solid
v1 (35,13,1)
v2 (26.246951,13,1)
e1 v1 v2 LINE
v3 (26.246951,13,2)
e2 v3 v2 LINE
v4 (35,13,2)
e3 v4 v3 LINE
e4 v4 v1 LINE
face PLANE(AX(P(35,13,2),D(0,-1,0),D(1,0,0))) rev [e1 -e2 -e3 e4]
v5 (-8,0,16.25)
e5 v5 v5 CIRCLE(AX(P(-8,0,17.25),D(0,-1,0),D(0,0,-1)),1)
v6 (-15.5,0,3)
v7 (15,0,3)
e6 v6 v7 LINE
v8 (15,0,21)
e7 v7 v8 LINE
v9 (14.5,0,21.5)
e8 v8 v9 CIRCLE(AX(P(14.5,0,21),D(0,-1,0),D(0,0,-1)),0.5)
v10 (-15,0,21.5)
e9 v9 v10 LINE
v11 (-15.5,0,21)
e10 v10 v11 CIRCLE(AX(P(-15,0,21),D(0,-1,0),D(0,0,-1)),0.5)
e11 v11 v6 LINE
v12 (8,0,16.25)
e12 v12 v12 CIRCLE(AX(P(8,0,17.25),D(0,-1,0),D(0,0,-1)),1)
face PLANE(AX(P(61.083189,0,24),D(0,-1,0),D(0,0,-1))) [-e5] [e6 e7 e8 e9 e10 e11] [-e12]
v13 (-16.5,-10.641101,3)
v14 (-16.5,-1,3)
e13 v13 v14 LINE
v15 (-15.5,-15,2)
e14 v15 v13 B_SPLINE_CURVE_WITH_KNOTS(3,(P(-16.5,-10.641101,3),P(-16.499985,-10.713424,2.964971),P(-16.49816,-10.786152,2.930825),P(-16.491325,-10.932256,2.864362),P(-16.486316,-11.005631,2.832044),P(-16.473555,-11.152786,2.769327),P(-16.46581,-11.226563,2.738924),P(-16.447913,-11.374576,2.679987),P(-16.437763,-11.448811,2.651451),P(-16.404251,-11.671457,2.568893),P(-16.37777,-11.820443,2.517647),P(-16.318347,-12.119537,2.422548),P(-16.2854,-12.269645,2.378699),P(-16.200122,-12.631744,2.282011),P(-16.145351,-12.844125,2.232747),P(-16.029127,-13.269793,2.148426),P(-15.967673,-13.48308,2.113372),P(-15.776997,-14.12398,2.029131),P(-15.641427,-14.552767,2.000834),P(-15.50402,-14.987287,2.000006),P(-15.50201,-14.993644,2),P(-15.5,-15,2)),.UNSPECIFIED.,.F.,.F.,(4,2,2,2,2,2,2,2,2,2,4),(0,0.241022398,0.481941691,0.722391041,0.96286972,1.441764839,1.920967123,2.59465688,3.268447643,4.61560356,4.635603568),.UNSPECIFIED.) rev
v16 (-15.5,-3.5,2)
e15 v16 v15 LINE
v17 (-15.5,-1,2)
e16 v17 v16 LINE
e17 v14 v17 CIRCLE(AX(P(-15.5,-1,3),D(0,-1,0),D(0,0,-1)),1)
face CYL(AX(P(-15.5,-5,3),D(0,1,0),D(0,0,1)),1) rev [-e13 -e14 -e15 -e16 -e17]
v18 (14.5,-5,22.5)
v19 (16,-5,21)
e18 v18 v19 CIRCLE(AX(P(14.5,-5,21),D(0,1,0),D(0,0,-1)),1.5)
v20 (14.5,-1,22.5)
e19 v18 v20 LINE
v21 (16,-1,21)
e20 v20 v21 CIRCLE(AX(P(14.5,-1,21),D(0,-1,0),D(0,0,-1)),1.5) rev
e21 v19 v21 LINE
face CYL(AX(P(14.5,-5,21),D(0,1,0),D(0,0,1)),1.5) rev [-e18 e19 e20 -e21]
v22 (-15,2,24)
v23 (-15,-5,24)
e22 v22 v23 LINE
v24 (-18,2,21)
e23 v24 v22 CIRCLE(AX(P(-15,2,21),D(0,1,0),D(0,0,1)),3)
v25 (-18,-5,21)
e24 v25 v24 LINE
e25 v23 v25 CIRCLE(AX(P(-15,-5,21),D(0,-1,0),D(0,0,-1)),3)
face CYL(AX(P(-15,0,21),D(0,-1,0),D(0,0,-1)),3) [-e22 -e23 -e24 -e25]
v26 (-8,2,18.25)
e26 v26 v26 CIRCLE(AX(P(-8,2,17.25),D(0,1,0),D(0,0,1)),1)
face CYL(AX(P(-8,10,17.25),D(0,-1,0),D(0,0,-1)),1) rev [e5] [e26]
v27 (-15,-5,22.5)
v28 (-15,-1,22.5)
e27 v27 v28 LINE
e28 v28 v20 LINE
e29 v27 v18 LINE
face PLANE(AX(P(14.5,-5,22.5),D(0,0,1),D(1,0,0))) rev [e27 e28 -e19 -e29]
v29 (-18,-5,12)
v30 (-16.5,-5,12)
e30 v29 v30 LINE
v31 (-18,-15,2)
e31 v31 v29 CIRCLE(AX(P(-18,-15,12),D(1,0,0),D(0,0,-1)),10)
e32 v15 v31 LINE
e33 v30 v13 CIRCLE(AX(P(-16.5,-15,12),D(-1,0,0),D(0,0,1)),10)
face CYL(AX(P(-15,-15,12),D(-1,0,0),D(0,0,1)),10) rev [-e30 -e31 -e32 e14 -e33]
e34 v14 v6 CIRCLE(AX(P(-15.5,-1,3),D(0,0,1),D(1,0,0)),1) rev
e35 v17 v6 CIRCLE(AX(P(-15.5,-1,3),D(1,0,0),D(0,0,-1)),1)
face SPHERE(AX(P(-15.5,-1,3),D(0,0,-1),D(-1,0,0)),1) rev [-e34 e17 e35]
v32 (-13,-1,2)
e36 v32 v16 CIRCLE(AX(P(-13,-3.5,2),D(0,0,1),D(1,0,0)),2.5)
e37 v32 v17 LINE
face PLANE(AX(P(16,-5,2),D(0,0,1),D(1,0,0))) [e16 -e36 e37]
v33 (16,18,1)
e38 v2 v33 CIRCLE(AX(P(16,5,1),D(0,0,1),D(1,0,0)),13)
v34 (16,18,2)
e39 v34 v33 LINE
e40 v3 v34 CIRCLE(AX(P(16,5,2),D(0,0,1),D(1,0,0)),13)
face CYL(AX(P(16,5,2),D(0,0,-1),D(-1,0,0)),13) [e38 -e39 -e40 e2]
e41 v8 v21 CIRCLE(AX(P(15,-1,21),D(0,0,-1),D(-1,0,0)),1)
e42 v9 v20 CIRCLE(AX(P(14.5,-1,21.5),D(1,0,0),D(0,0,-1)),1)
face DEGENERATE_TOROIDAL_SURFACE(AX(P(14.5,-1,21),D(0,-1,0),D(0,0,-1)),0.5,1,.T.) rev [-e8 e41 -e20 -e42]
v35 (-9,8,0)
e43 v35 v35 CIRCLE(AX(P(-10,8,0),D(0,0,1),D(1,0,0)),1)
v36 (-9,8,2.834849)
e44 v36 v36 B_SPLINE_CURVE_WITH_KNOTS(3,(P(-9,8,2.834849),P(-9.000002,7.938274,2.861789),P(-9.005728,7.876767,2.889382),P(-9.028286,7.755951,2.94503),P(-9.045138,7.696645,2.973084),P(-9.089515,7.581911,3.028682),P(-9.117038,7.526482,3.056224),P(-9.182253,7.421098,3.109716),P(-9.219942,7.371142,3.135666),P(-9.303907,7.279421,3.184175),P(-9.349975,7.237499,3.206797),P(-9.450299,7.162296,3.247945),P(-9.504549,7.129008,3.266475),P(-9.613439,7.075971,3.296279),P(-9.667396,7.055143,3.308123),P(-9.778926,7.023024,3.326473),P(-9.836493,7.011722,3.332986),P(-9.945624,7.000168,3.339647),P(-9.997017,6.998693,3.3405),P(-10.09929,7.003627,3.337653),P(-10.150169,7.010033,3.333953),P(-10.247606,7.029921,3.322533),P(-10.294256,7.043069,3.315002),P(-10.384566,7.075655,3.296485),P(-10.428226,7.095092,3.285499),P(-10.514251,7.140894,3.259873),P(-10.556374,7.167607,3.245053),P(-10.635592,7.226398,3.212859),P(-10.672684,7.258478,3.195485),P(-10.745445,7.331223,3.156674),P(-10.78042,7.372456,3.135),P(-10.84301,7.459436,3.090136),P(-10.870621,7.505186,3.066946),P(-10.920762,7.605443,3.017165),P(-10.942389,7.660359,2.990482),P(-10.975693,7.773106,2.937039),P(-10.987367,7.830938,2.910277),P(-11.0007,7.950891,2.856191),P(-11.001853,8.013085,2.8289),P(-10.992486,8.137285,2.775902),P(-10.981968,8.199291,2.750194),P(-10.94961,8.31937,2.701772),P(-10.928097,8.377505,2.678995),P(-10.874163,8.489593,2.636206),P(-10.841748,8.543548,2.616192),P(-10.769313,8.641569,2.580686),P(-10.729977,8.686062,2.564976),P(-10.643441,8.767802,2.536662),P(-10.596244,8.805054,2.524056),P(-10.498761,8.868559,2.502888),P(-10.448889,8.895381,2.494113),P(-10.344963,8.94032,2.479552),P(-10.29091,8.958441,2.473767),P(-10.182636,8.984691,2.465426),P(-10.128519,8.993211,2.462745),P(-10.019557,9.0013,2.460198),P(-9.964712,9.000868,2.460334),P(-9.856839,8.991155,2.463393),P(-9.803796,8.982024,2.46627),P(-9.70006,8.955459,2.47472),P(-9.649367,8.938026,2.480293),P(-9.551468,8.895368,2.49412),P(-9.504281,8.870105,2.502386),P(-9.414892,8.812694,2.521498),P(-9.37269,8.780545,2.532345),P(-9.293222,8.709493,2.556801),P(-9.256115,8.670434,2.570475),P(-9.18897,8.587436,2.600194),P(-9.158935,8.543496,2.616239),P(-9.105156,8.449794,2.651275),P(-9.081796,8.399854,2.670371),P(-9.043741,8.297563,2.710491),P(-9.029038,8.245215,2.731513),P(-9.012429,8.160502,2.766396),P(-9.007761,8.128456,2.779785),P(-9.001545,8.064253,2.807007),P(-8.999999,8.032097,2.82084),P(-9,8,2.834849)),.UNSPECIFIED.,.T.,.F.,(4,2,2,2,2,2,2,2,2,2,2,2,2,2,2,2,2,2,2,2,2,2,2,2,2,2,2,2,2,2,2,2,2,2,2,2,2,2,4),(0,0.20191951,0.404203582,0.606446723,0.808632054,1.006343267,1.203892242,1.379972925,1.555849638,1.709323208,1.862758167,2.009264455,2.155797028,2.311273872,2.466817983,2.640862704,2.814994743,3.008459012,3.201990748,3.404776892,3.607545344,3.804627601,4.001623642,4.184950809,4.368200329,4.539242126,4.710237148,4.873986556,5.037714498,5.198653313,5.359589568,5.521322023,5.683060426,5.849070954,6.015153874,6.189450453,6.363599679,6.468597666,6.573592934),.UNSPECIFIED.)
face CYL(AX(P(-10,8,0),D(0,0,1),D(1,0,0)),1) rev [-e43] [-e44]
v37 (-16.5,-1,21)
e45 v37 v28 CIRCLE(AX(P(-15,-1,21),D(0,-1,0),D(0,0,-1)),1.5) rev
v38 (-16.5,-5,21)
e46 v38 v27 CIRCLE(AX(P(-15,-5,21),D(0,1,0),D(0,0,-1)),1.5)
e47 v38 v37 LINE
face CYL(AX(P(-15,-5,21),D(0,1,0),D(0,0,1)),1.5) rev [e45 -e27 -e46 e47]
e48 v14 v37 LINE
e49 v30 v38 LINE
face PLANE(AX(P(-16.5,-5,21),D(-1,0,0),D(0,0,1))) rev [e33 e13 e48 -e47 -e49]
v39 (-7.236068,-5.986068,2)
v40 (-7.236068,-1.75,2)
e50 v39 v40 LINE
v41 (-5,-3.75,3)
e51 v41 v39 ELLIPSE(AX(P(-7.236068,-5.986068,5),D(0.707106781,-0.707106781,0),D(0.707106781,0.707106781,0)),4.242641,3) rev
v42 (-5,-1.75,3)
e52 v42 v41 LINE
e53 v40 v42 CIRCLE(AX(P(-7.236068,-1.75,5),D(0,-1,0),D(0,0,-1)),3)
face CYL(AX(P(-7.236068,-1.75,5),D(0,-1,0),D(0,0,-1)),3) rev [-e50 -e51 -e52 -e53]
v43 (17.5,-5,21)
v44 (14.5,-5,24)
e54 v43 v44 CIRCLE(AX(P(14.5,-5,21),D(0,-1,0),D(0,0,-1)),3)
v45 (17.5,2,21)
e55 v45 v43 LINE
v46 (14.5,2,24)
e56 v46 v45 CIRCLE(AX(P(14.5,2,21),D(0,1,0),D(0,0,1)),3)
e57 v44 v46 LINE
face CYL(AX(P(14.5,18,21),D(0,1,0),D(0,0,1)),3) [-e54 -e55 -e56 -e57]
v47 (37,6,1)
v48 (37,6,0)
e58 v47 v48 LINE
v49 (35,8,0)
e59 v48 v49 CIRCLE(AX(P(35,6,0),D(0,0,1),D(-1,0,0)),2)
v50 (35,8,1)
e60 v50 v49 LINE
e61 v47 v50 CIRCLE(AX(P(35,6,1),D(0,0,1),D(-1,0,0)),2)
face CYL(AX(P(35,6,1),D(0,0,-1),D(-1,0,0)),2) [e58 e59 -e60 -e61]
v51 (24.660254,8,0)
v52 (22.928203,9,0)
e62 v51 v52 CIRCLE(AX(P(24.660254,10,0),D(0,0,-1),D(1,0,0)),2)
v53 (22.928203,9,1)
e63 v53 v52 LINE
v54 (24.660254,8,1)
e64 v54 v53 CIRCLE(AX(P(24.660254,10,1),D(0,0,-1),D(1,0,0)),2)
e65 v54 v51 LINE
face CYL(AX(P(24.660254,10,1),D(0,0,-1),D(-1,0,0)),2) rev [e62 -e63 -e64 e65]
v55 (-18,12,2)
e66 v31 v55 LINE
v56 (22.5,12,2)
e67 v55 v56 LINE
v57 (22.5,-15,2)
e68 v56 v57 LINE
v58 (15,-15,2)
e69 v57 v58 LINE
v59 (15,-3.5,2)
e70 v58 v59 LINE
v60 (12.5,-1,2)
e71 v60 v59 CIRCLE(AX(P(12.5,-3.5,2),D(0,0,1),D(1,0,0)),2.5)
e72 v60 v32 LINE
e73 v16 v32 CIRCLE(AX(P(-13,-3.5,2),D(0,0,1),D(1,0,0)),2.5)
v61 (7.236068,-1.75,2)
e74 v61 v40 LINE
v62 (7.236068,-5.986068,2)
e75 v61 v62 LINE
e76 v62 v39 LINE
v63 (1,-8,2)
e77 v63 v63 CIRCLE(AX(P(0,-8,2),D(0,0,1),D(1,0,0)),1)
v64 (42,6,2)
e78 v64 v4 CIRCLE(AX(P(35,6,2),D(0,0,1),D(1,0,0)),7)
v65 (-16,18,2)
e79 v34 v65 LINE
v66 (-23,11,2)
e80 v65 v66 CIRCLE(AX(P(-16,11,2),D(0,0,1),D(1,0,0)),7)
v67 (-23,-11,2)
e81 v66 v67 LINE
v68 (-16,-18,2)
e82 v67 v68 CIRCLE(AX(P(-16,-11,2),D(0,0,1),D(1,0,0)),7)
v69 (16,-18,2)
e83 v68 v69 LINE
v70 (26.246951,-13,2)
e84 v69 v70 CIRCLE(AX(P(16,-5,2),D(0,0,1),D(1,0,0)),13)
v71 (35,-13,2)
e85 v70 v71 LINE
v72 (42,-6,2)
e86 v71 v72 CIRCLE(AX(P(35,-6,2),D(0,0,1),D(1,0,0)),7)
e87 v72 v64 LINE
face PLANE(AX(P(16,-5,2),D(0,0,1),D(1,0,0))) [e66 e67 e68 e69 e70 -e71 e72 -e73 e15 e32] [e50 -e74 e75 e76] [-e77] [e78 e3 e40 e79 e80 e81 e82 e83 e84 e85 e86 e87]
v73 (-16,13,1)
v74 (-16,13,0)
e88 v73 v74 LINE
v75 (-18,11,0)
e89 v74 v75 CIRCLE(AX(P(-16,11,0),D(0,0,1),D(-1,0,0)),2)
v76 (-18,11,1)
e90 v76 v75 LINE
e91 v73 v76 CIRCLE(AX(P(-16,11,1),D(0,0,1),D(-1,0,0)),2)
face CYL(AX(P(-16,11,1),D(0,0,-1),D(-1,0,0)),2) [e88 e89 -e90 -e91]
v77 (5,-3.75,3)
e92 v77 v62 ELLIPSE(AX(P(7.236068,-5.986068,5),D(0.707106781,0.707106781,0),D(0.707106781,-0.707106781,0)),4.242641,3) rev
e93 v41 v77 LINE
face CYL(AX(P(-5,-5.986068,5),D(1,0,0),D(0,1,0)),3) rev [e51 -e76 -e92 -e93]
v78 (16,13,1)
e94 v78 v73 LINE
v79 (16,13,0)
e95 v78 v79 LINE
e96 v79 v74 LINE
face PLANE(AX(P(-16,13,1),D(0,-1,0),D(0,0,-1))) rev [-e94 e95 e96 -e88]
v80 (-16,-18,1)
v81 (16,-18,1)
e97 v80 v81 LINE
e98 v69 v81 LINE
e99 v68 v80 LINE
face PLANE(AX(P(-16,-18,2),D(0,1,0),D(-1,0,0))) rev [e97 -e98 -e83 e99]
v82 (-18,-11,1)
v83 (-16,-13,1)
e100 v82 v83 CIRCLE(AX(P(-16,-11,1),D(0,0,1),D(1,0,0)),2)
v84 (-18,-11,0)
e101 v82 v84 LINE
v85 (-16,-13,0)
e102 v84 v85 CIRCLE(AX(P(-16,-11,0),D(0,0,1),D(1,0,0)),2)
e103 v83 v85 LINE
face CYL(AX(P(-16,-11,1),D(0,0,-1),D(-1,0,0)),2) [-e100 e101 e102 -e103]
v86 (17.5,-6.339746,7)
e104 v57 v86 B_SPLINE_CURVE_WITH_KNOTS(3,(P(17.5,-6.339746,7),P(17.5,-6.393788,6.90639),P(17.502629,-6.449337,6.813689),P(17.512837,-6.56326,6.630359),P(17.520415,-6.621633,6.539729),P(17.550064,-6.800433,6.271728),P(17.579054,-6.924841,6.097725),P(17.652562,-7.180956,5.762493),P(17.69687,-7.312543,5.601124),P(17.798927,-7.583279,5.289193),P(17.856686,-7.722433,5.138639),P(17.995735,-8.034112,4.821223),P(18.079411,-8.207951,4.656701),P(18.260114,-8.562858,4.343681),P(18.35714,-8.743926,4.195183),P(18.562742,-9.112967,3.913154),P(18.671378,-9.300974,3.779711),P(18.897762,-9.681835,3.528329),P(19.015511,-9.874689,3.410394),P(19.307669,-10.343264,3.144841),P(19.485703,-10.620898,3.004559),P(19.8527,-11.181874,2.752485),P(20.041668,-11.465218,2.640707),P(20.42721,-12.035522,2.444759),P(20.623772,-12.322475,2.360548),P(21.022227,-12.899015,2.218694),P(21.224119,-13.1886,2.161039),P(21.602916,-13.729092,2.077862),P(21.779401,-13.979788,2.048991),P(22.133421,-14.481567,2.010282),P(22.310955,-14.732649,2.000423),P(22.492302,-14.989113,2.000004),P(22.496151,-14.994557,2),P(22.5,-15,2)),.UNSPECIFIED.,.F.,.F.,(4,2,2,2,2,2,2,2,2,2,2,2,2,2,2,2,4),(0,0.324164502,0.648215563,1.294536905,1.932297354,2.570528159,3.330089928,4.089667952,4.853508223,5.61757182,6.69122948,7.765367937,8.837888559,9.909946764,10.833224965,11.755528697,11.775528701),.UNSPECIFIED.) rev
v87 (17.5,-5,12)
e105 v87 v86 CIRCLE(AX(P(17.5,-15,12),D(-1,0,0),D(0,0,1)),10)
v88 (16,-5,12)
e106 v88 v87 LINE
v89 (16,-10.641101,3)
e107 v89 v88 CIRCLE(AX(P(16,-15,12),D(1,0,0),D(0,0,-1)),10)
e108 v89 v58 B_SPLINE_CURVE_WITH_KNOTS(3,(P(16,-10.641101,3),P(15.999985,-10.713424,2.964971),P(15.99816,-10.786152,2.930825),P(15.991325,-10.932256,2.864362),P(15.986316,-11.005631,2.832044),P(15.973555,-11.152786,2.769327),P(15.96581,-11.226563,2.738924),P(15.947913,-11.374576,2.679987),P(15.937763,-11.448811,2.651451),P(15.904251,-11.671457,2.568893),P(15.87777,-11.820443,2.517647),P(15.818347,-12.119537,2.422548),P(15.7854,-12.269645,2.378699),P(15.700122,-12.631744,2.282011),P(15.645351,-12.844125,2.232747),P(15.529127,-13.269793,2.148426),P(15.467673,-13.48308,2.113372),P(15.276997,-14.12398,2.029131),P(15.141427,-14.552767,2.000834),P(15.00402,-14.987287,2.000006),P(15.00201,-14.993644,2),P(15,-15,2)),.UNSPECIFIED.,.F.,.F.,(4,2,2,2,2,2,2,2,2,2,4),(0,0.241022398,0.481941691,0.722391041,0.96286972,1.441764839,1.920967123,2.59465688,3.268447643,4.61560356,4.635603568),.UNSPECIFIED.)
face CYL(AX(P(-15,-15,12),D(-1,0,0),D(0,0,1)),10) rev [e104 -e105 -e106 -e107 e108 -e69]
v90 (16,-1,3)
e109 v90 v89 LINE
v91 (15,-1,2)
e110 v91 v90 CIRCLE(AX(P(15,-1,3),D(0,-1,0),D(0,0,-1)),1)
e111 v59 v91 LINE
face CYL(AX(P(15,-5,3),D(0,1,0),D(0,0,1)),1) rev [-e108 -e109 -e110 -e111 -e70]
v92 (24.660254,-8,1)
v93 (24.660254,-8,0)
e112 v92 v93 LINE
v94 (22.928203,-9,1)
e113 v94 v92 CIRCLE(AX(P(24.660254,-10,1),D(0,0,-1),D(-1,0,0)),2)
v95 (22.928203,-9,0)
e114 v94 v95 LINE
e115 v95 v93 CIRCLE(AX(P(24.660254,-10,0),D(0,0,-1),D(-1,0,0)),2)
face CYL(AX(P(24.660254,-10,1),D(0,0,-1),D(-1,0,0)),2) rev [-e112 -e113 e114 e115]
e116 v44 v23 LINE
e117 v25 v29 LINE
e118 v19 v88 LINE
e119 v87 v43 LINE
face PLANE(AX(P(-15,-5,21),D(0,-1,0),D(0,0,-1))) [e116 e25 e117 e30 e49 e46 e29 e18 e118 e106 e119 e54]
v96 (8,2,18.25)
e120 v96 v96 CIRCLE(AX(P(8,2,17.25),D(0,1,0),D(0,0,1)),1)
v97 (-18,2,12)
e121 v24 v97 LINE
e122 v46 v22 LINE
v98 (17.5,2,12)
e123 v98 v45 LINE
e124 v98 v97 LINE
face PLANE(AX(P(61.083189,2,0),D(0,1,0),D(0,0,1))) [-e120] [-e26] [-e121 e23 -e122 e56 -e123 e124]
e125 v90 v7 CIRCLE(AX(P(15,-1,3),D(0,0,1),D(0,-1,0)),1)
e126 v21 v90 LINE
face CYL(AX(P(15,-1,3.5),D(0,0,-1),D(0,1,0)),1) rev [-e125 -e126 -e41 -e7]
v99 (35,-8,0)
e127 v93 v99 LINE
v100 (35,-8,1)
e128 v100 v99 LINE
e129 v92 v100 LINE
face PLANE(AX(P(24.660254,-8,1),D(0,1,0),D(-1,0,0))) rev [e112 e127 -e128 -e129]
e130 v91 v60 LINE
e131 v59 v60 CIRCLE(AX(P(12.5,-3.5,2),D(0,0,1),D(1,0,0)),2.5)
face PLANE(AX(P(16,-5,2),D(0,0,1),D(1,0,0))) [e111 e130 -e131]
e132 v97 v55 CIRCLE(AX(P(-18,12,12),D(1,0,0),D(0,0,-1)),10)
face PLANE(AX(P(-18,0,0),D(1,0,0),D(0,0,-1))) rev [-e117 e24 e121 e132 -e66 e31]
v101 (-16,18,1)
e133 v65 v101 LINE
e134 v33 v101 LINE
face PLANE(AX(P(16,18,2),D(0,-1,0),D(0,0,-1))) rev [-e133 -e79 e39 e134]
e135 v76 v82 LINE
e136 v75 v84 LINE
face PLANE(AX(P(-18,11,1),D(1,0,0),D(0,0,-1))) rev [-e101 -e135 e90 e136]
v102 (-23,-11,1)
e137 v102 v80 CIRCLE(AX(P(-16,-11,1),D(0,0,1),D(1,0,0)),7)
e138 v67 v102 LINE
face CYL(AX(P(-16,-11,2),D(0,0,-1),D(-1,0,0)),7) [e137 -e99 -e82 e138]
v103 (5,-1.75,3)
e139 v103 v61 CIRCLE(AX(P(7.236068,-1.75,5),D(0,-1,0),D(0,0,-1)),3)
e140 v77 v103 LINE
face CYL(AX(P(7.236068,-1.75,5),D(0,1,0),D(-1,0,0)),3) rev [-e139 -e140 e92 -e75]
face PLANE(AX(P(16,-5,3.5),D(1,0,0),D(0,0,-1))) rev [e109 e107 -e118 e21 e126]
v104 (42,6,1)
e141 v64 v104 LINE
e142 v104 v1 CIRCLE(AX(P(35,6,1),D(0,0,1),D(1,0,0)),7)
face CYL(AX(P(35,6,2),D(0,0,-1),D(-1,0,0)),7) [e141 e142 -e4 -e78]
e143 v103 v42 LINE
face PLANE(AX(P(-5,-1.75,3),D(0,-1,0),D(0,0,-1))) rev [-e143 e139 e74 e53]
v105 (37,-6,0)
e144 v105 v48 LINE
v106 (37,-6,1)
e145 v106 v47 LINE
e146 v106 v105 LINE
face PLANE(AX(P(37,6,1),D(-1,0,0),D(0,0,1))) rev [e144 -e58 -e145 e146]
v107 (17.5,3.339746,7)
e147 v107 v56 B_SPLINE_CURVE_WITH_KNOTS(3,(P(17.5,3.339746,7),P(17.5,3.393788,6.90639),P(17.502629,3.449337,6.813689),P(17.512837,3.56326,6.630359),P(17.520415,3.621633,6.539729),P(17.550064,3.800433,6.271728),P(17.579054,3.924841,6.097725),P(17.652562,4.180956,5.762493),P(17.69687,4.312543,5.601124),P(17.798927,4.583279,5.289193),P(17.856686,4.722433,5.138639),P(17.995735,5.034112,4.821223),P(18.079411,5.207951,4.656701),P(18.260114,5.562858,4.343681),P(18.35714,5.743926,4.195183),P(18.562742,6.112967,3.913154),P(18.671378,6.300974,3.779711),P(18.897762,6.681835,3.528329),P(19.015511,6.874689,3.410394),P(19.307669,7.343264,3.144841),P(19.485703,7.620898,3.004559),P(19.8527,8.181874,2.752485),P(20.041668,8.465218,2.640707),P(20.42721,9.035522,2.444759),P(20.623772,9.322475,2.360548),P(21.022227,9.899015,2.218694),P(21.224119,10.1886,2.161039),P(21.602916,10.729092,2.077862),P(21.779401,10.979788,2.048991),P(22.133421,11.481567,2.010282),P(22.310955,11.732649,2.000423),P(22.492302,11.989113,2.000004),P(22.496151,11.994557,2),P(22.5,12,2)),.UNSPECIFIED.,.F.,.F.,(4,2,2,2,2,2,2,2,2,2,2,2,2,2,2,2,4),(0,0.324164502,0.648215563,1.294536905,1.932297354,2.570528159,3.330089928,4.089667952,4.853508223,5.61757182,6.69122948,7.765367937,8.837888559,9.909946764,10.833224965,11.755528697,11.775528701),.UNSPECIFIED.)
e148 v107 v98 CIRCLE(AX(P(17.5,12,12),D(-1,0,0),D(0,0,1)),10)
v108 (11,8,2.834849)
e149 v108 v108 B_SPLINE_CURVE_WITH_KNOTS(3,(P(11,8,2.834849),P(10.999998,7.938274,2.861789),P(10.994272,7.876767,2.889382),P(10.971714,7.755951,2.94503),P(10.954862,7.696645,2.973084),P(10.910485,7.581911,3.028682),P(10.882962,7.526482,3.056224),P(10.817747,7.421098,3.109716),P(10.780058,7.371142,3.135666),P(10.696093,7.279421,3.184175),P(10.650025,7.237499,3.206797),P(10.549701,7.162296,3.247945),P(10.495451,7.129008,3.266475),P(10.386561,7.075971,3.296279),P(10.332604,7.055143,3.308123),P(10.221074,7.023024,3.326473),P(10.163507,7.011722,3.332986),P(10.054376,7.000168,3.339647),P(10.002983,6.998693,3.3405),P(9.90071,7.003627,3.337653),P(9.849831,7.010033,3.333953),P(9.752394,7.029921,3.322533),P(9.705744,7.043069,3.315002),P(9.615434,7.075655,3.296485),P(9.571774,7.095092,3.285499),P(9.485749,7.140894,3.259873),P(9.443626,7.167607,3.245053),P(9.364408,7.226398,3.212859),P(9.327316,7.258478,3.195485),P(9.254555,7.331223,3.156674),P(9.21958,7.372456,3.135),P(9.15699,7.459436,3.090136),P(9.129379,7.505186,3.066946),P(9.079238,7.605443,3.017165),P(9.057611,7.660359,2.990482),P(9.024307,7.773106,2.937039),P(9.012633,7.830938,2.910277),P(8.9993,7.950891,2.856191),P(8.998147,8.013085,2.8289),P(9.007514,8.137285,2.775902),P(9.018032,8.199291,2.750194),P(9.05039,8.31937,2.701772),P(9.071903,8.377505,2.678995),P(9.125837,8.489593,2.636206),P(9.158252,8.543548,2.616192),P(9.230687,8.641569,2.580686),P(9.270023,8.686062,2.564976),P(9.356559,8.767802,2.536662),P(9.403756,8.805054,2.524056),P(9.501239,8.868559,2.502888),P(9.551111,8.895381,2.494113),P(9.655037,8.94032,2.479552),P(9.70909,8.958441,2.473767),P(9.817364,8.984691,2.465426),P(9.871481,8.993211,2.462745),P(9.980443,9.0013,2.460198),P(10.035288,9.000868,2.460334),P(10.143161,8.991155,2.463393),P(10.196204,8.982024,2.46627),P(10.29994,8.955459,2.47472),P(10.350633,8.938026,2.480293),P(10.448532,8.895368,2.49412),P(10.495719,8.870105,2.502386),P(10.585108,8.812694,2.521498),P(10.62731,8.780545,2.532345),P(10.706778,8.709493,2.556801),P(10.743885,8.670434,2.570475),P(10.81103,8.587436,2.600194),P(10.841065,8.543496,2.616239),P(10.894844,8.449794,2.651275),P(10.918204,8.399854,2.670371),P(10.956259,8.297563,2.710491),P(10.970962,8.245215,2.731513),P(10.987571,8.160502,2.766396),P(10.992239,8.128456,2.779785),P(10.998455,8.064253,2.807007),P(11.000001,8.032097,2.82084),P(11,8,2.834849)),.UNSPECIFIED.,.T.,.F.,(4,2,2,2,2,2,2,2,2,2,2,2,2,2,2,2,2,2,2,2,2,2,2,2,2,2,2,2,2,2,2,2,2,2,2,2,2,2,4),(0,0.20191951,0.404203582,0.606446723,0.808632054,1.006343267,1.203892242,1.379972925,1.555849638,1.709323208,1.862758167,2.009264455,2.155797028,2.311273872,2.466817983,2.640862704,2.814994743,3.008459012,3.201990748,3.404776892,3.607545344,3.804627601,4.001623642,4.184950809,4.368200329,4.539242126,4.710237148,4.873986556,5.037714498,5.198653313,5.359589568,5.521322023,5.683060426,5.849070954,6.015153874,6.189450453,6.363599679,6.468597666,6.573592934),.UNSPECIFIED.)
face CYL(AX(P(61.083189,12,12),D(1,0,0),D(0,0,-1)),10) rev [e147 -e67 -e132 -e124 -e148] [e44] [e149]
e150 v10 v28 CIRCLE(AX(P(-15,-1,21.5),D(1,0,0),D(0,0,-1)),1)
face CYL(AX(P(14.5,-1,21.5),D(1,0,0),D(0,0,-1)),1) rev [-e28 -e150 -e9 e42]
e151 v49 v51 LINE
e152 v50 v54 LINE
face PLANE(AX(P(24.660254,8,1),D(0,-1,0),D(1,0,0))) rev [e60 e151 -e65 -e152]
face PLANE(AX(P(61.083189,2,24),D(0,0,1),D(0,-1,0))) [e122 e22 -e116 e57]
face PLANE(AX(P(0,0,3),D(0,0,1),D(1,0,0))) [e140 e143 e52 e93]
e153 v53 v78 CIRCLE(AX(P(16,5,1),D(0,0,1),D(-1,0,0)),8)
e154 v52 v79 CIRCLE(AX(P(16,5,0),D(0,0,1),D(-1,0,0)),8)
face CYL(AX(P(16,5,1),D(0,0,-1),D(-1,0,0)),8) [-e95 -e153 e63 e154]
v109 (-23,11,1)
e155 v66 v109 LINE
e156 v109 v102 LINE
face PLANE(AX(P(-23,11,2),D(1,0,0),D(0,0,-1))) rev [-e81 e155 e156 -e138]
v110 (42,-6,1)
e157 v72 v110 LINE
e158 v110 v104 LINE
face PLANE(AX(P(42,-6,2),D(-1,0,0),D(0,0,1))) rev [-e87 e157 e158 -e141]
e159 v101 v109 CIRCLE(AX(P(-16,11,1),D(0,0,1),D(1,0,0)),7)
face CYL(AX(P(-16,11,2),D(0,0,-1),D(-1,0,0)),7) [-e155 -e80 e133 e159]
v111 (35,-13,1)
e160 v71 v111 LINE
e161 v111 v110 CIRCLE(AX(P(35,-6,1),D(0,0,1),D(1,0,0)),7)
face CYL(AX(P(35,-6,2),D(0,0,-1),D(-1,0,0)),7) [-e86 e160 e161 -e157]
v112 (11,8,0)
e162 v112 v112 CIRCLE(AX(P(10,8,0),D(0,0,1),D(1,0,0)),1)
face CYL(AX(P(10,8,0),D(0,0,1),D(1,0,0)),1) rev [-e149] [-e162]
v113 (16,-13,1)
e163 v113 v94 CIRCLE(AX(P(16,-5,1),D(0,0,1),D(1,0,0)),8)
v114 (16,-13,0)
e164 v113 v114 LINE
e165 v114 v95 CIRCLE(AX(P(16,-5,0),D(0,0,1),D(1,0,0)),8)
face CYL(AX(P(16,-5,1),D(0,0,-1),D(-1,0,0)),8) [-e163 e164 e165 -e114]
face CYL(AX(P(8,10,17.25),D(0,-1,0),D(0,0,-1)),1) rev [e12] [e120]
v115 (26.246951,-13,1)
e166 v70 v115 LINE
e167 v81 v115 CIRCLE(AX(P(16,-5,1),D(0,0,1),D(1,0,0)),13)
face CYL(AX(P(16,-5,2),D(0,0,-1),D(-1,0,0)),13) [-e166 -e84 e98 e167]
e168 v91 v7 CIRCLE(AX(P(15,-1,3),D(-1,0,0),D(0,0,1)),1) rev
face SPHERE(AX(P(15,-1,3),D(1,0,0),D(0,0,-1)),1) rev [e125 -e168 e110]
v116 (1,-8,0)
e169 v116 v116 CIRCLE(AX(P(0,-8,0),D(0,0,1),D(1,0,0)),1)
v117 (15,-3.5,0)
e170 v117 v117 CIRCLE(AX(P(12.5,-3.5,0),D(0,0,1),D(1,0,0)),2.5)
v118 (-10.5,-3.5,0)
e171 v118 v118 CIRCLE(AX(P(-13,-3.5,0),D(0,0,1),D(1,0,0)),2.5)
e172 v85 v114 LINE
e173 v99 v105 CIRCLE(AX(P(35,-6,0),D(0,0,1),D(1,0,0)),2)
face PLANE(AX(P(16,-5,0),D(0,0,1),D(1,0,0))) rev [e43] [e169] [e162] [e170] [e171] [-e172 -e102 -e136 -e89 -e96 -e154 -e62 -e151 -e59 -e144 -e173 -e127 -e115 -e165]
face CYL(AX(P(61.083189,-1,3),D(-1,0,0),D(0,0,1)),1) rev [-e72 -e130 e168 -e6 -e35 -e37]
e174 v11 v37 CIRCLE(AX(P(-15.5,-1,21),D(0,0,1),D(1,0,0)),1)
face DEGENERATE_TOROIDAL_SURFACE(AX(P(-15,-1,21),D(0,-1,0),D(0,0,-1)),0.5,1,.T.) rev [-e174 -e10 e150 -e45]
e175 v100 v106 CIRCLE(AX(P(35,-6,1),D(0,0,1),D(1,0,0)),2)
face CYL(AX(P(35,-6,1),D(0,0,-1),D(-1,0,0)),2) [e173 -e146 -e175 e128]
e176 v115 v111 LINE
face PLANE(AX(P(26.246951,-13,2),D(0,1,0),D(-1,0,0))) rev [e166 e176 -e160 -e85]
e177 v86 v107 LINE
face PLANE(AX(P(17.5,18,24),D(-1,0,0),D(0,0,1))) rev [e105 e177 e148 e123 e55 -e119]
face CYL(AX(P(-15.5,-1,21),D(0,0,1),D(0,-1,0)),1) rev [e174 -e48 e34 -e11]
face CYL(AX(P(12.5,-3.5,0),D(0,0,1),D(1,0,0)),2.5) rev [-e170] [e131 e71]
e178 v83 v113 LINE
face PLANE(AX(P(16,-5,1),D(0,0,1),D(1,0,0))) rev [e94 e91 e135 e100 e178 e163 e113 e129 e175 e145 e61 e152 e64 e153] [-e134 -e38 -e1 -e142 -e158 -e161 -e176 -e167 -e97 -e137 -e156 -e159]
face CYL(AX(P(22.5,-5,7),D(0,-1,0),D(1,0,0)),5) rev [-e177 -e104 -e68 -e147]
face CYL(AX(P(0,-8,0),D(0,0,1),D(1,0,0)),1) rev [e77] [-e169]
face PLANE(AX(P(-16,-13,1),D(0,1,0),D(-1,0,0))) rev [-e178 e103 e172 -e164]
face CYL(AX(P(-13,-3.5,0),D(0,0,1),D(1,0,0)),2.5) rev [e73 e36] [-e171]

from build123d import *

# Parameters (mm, degrees)
INSERT_IN_SHEET_METAL_HOLE_DEPTH  = 1
BOSS_EXTRUDE5_DEPTH               = 1
SKETCH2_W                         = 24
SKETCH2_H                         = 2
LED_BACKING_DEPTH                 = 55
SKETCH3_R                         = 1
LED_SCREWHOLES_DEPTH              = 10
LED_BACKING_CLEANUP_DEPTH         = 52.613951602
LED_BACKING_CLEANUP_DEPTH_BACK    = 52.613951602
SKETCH5_W                         = 19.5
SKETCH5_H                         = 22
FILLET1_R                         = 3
BOSS_EXTRUDE3_START               = 5
BOSS_EXTRUDE3_DEPTH               = 5
FILLET2_R                         = 10
FILLET3_R                         = 5
FILLET4_R                         = 1
SKETCH7_R                         = 2.5
LED_WIRE_HOLES_DEPTH              = 51.714889332
SCREWHOLES_FOR_BACKING_DEPTH      = 51.714889332
SCREWHOLES_FOR_BACKING_DEPTH_BACK = 51.714889332
SKETCH8_R                         = 1
SKETCH9_W                         = 10
SKETCH9_H                         = 2
BOSS_EXTRUDE4_DEPTH               = 1
FILLET5_R                         = 3


with BuildPart() as part:
    # Sketch1 → Insert in sheet metal hole (new body)
    with BuildSketch(Plane.XY):
        with BuildLine():
            Line((-18, 11), (-18, -11))
            ThreePointArc((-18, -11), (-17.414213562, -12.414213562), (-16, -13))
            Line((-16, -13), (16, -13))
            ThreePointArc((16, -13), (20, -11.92820323), (22.92820323, -9))
            ThreePointArc((22.92820323, -9), (23.660254038, -8.267949192), (24.660254038, -8))
            Line((24.660254038, -8), (35, -8))
            ThreePointArc((35, -8), (36.414213562, -7.414213562), (37, -6))
            Line((37, -6), (37, 6))
            ThreePointArc((37, 6), (36.414213562, 7.414213562), (35, 8))
            Line((35, 8), (24.660254038, 8))
            ThreePointArc((24.660254038, 8), (23.660254038, 8.267949192), (22.92820323, 9))
            ThreePointArc((22.92820323, 9), (20, 11.92820323), (16, 13))
            Line((16, 13), (-16, 13))
            ThreePointArc((-16, 13), (-17.414213562, 12.414213562), (-18, 11))
        make_face()
    extrude(amount=INSERT_IN_SHEET_METAL_HOLE_DEPTH)

    # Sketch10 → Boss-Extrude5 (add)
    with BuildSketch(Plane.XY.offset(1)):
        with BuildLine():
            Line((26.246950766, -13), (35, -13))
            ThreePointArc((35, -13), (39.949747468, -10.949747468), (42, -6))
            Line((42, -6), (42, 6))
            ThreePointArc((42, 6), (39.949747468, 10.949747468), (35, 13))
            Line((35, 13), (26.246950766, 13))
            ThreePointArc((26.246950766, 13), (21.700877125, 16.683321446), (16, 18))
            Line((16, 18), (-16, 18))
            ThreePointArc((-16, 18), (-20.949747468, 15.949747468), (-23, 11))
            Line((-23, 11), (-23, -11))
            ThreePointArc((-23, -11), (-20.949747468, -15.949747468), (-16, -18))
            Line((-16, -18), (16, -18))
            ThreePointArc((16, -18), (21.700877125, -16.683321446), (26.246950766, -13))
        make_face()
    extrude(amount=BOSS_EXTRUDE5_DEPTH)

    # Sketch2 → LED backing (add)
    with BuildSketch(Plane.ZY.offset(18)):
        with Locations((12, 1)):
            Rectangle(SKETCH2_W, SKETCH2_H)
    extrude(amount=-LED_BACKING_DEPTH)

    # Sketch3 → LED screwholes (cut)
    with BuildSketch(Plane.XZ):
        with Locations(Location((-8, 17.25, 0), (0, 0, 270))):
            Circle(SKETCH3_R)
        with Locations(Location((8, 17.25, 0), (0, 0, 270))):
            Circle(SKETCH3_R)
    extrude(amount=-LED_SCREWHOLES_DEPTH, mode=Mode.SUBTRACT)

    # Sketch5 → LED backing cleanup (cut, two sides: drawn at the far end of the back side and taken through both)
    with BuildSketch(Plane.XZ.offset(-LED_BACKING_CLEANUP_DEPTH_BACK)):
        with Locations((27.25, 13)):
            Rectangle(SKETCH5_W, SKETCH5_H)
    extrude(amount=LED_BACKING_CLEANUP_DEPTH + LED_BACKING_CLEANUP_DEPTH_BACK, mode=Mode.SUBTRACT)

    # Fillet1
    fillet1_edges = [part.edges().sort_by_distance(p)[0] for p in [
        (17.5, 1, 24),
        (-18, 1, 24),
    ]]
    fillet(fillet1_edges, radius=FILLET1_R)

    # Sketch6 → Boss-Extrude3 (add)
    with BuildSketch(Plane.XZ.offset(BOSS_EXTRUDE3_START)):
        with BuildLine():
            Line((14.5, 24), (-15, 24))
            ThreePointArc((-15, 24), (-17.121320344, 23.121320344), (-18, 21))
            Line((-18, 21), (-18, 2))
            Line((-18, 2), (-16.5, 2))
            Line((-16.5, 2), (-16.5, 3.5))
            Line((-16.5, 3.5), (-16.5, 21))
            ThreePointArc((-16.5, 21), (-16.060660172, 22.060660172), (-15, 22.5))
            Line((-15, 22.5), (14.5, 22.5))
            ThreePointArc((14.5, 22.5), (15.560660172, 22.060660172), (16, 21))
            Line((16, 21), (16, 3.5))
            Line((16, 3.5), (16, 2))
            Line((16, 2), (17.5, 2))
            Line((17.5, 2), (17.5, 21))
            ThreePointArc((17.5, 21), (16.621320344, 23.121320344), (14.5, 24))
        make_face()
    extrude(amount=-BOSS_EXTRUDE3_DEPTH)

    # Fillet2
    fillet2_edges = [part.edges().sort_by_distance(p)[0] for p in [
        (-0.25, 2, 2),
        (-17.25, -5, 2),
        (16.75, -5, 2),
    ]]
    fillet(fillet2_edges, radius=FILLET2_R)

    # Fillet3
    fillet3_edges = [part.edges().sort_by_distance(p)[0] for p in [
        (17.5, -1.5, 2),
    ]]
    fillet(fillet3_edges, radius=FILLET3_R)

    # Fillet4
    fillet4_edges = [part.edges().sort_by_distance(p)[0] for p in [
        (-0.25, 0, 2),
        (-16.5, 0, 11.5),
        (-16.5, -7.5, 2),
        (-16.060660172, 0, 22.060660172),
        (-0.25, 0, 22.5),
        (15.560660172, 0, 22.060660172),
        (16, 0, 11.5),
        (16, -7.5, 2),
    ]]
    fillet(fillet4_edges, radius=FILLET4_R)

    # Sketch7 → LED wire holes (cut, through all)
    with BuildSketch(Plane.XY.offset(2)):
        with Locations((-13, -3.5)):
            Circle(SKETCH7_R)
        with Locations((12.5, -3.5)):
            Circle(SKETCH7_R)
    extrude(amount=-LED_WIRE_HOLES_DEPTH, mode=Mode.SUBTRACT)

    # Sketch8 → Screwholes for backing (cut, two sides: drawn at the far end of the back side and taken through both)
    with BuildSketch(Plane.XY.offset(2).offset(-SCREWHOLES_FOR_BACKING_DEPTH_BACK)):
        with Locations((0, -8)):
            Circle(SKETCH8_R)
        with Locations((-10, 8)):
            Circle(SKETCH8_R)
        with Locations((10, 8)):
            Circle(SKETCH8_R)
    extrude(amount=SCREWHOLES_FOR_BACKING_DEPTH + SCREWHOLES_FOR_BACKING_DEPTH_BACK, mode=Mode.SUBTRACT)

    # Sketch9 → Boss-Extrude4 (add)
    with BuildSketch(Plane.XY.offset(2)):
        with Locations((0, -2.75)):
            Rectangle(SKETCH9_W, SKETCH9_H)
    extrude(amount=BOSS_EXTRUDE4_DEPTH)

    # Fillet5
    # the kernel refuses this fillet: 3 mm, written as the material it adds along each edge
    with BuildSketch(Plane(origin=(5, -1.75, 2), x_dir=(1, 0, 0), z_dir=(0, -1, 0)), Plane(origin=(-5, -3.75, 2), x_dir=(-1, 0, 0), z_dir=(0, 1, 0))) as fillet5_piece_1:
        with BuildLine():
            CenterArc((2.236067977, 3), FILLET5_R, 221.810314896, 48.189685104)
            Line((0, 1), (0, 0))
            Line((0, 0), (2.236067977, 0))
        make_face()
    extrude(amount=2)
    with BuildSketch(Plane(origin=(5, -3.75, 2), x_dir=(0, -1, 0), z_dir=(-1, 0, 0))) as fillet5_piece_2:
        with BuildLine():
            CenterArc((2.236067977, 3), FILLET5_R, 221.810314896, 48.189685104)
            Line((0, 1), (0, 0))
            Line((0, 0), (2.236067977, 0))
        make_face()
    extrude(amount=10)
    with BuildSketch(Plane(origin=(10.590169944, -3.75, 2), x_dir=(0, -1, 0), z_dir=(-1, 0, 0))) as fillet5_piece_3a_section:
        with BuildLine():
            CenterArc((2.236067977, 3), FILLET5_R, 221.810314896, 48.189685104)
            Line((0, 1), (0, 0))
            Line((0, 0), (2.236067977, 0))
        make_face()
    fillet5_piece_3a = extrude(amount=15.590169944, mode=Mode.PRIVATE)
    fillet5_piece_3a = fillet5_piece_3a - Plane(origin=(12.5, -3.5, 2), x_dir=(1, 0, 0), z_dir=(0, 0, 1)) * Cylinder(2.5, 41, mode=Mode.PRIVATE)
    fillet5_piece_3a = split(fillet5_piece_3a, bisect_by=Plane(origin=(5, -3.75, 2), z_dir=(1, 0, 0)), keep=Keep.TOP, mode=Mode.PRIVATE)
    with BuildSketch(Plane(origin=(5, -1.75, 2), x_dir=(1, 0, 0), z_dir=(0, -1, 0))) as fillet5_piece_3b_section:
        with BuildLine():
            CenterArc((2.236067977, 3), FILLET5_R, 221.810314896, 48.189685104)
            Line((0, 1), (0, 0))
            Line((0, 0), (2.236067977, 0))
        make_face()
    fillet5_piece_3b = extrude(amount=7.590169944, mode=Mode.PRIVATE)
    fillet5_piece_3b = split(fillet5_piece_3b, bisect_by=Plane(origin=(5, -3.75, 2), z_dir=(0, -1, 0)), keep=Keep.TOP, mode=Mode.PRIVATE)
    fillet5_piece_3 = fillet5_piece_3a & fillet5_piece_3b
    add(fillet5_piece_3)
    with BuildSketch(Plane(origin=(-5, -9.340169944, 2), x_dir=(-1, 0, 0), z_dir=(0, 1, 0))) as fillet5_piece_4a_section:
        with BuildLine():
            CenterArc((2.236067977, 3), FILLET5_R, 221.810314896, 48.189685104)
            Line((0, 1), (0, 0))
            Line((0, 0), (2.236067977, 0))
        make_face()
    fillet5_piece_4a = extrude(amount=7.590169944, mode=Mode.PRIVATE)
    fillet5_piece_4a = split(fillet5_piece_4a, bisect_by=Plane(origin=(-5, -3.75, 2), z_dir=(0, -1, 0)), keep=Keep.TOP, mode=Mode.PRIVATE)
    with BuildSketch(Plane(origin=(5, -3.75, 2), x_dir=(0, -1, 0), z_dir=(-1, 0, 0))) as fillet5_piece_4b_section:
        with BuildLine():
            CenterArc((2.236067977, 3), FILLET5_R, 221.810314896, 48.189685104)
            Line((0, 1), (0, 0))
            Line((0, 0), (2.236067977, 0))
        make_face()
    fillet5_piece_4b = extrude(amount=15.590169944, mode=Mode.PRIVATE)
    fillet5_piece_4b = split(fillet5_piece_4b, bisect_by=Plane(origin=(-5, -3.75, 2), z_dir=(-1, 0, 0)), keep=Keep.TOP, mode=Mode.PRIVATE)
    fillet5_piece_4b = fillet5_piece_4b - Plane(origin=(-13, -3.5, 2), x_dir=(1, 0, 0), z_dir=(0, 0, 1)) * Cylinder(2.5, 41, mode=Mode.PRIVATE)
    fillet5_piece_4 = fillet5_piece_4a & fillet5_piece_4b
    add(fillet5_piece_4)


solid = part.part
